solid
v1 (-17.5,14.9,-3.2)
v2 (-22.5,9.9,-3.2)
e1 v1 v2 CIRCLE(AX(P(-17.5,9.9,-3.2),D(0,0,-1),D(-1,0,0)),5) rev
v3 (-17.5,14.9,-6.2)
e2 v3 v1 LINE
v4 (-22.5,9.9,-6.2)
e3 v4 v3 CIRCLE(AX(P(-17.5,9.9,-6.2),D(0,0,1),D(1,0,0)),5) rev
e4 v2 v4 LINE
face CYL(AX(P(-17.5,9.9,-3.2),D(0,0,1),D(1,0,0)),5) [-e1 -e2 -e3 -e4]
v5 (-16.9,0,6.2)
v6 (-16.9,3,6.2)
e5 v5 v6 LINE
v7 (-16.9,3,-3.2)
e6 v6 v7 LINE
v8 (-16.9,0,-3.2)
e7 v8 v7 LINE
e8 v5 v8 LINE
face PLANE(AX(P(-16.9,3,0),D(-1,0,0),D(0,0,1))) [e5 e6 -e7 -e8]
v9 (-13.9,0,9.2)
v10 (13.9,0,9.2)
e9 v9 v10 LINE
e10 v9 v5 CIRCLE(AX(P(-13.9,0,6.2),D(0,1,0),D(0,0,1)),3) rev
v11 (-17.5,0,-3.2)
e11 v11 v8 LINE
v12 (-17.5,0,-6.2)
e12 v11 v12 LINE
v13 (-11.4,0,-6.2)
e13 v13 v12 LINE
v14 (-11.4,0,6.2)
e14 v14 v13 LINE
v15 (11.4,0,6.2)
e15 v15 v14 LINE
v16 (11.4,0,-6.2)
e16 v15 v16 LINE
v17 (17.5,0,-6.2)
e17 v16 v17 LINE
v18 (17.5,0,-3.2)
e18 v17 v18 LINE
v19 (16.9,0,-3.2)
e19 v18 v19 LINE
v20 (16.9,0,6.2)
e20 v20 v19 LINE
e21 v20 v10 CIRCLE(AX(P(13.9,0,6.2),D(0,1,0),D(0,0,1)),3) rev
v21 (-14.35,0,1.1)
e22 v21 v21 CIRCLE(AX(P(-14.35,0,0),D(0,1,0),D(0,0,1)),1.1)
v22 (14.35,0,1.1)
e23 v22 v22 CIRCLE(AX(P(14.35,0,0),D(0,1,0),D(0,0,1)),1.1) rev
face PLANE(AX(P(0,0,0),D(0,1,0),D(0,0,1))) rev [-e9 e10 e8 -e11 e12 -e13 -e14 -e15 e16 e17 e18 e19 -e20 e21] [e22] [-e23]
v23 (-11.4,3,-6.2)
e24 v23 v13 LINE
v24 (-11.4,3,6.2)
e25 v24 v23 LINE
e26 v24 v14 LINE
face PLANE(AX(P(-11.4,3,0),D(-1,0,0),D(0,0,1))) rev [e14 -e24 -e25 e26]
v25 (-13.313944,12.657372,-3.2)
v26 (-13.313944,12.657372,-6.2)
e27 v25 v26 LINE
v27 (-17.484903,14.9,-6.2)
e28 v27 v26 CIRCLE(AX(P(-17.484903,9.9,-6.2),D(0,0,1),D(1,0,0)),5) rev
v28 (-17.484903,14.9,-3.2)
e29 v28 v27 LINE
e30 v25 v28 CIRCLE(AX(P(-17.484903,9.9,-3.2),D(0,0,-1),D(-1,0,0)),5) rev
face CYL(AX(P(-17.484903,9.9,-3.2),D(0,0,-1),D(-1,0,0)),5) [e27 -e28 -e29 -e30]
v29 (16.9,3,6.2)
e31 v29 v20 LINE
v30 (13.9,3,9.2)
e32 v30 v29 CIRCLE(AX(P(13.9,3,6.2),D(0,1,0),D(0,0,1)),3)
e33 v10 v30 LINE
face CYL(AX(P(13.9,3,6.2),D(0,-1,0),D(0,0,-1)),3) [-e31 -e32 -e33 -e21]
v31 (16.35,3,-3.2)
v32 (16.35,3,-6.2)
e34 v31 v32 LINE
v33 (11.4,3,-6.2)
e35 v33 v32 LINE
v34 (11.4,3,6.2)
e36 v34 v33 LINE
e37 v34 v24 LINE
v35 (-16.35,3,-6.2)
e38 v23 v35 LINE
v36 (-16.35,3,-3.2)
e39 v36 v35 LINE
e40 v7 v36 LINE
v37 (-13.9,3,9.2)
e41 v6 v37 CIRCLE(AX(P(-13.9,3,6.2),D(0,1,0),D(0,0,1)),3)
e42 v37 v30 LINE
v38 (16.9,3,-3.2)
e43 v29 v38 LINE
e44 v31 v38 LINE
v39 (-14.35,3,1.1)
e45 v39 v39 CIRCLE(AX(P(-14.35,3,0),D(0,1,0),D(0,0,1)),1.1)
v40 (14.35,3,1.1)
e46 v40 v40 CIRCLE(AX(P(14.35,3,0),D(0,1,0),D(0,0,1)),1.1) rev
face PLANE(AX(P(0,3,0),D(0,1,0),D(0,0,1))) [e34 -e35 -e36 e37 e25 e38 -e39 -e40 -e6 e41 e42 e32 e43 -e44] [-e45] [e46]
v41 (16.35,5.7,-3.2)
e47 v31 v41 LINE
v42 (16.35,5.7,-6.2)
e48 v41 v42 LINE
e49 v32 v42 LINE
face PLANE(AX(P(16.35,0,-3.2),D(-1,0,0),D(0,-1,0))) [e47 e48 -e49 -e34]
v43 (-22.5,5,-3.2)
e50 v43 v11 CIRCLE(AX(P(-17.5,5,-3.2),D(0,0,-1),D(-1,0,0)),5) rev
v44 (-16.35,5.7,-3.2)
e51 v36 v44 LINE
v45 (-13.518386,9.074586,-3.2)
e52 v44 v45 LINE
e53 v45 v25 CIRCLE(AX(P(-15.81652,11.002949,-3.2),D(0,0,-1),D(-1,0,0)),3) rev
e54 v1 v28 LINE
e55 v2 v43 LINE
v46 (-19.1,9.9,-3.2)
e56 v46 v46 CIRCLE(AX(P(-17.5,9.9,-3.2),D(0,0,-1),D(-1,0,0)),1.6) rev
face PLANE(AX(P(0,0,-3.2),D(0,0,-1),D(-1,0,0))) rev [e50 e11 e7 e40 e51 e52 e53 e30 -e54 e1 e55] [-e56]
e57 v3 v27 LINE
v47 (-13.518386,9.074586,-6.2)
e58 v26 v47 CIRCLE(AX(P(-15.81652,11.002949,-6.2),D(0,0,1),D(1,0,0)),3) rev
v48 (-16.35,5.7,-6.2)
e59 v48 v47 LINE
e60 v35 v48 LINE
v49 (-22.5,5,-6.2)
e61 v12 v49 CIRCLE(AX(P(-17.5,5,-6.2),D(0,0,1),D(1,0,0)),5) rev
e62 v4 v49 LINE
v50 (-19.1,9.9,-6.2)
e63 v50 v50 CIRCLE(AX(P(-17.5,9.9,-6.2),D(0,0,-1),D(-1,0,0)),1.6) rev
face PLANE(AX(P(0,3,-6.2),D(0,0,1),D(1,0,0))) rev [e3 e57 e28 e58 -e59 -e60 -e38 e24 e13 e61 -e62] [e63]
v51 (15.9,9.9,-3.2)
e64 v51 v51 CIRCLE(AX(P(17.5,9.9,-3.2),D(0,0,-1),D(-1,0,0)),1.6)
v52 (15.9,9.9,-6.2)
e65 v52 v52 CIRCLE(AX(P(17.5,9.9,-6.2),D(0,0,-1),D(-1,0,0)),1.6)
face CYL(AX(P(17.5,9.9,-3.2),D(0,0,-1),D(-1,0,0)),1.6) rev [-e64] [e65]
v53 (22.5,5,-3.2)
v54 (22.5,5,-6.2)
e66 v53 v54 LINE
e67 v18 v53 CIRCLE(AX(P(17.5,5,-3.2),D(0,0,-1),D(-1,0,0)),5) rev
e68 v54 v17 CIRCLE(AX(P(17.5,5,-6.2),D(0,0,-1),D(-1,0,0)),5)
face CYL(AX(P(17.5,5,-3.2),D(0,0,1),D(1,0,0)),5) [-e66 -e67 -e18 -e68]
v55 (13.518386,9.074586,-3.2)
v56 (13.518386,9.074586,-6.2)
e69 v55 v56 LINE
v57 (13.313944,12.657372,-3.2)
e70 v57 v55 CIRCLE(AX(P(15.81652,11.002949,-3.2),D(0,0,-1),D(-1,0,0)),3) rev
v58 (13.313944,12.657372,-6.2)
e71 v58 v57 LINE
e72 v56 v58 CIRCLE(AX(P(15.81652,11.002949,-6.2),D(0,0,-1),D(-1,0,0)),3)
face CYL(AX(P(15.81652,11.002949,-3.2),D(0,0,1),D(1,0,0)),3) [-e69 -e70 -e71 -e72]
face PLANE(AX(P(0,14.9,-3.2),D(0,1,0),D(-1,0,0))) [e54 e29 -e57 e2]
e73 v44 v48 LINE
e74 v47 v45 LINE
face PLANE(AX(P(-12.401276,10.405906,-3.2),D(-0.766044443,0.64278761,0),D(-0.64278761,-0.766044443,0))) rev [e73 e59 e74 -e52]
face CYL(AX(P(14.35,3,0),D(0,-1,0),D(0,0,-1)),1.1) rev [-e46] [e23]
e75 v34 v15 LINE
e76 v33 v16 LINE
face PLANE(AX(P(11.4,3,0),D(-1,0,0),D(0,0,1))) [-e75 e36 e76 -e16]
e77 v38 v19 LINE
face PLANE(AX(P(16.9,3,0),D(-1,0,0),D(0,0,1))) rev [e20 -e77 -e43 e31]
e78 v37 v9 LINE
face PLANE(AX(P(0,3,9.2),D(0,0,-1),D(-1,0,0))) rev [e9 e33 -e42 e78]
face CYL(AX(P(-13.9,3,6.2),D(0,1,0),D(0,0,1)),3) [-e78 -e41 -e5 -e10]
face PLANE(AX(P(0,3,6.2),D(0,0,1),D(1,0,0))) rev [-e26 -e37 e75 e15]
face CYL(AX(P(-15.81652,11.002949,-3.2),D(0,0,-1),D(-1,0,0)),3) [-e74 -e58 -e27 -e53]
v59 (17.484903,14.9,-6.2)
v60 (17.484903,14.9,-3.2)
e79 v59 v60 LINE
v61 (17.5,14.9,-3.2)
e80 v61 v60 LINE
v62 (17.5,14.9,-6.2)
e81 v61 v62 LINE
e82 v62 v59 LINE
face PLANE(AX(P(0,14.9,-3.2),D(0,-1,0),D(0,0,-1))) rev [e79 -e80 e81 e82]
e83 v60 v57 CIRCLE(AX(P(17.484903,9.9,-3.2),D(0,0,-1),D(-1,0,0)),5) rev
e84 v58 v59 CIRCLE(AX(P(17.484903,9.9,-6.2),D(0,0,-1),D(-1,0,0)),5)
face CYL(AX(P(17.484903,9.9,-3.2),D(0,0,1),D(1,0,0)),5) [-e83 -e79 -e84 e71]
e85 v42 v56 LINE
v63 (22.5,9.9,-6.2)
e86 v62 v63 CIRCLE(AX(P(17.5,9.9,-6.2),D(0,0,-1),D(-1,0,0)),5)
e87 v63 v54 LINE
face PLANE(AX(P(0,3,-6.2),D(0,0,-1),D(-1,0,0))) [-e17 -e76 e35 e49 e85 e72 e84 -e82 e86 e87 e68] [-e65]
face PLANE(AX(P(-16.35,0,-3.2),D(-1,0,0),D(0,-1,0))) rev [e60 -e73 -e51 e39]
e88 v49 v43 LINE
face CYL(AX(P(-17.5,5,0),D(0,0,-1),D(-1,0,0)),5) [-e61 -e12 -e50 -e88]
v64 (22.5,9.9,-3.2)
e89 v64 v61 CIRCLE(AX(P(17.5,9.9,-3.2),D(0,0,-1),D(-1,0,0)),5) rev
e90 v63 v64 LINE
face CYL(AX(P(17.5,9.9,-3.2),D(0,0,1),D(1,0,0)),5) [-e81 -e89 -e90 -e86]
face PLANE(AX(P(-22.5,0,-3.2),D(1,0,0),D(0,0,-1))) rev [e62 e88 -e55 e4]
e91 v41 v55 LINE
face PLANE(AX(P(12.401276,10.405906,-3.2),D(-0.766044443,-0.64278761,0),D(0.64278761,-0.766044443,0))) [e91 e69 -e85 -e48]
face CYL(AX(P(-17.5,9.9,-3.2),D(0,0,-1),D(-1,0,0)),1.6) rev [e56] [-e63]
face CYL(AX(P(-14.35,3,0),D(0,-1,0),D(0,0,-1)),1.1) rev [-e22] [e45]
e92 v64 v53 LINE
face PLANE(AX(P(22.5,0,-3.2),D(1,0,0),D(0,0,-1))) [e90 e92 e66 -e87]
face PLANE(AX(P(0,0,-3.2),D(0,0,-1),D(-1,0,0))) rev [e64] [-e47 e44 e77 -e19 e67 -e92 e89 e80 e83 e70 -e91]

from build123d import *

# Parameters (mm, degrees)
SKETCH1_R           = 1.1
BOSS_EXTRUDE1_DEPTH = 3
FILLET1_R           = 3
SKETCH2_R           = 1.6
BOSS_EXTRUDE2_DEPTH = 3
FILLET2_R           = 5
FILLET3_R           = 3


with BuildPart() as part:
    # Sketch1 → Boss-Extrude1 (new body)
    with BuildSketch(Plane(origin=(0, 0, 0), x_dir=(1, 0, 0), z_dir=(0, 1, 0))):
        Polygon((-16.9, -9.2), (16.9, -9.2), (16.9, 6.2), (11.4, 6.2), (11.4, -6.2), (-11.4, -6.2), (-11.4, 6.2), (-16.9, 6.2), align=None)
        with Locations(Location((-14.35, 0, 0), (0, 0, 270))):
            Circle(SKETCH1_R, mode=Mode.SUBTRACT)
        with Locations(Location((14.35, 0, 0), (0, 0, 270))):
            Circle(SKETCH1_R, mode=Mode.SUBTRACT)
    extrude(amount=BOSS_EXTRUDE1_DEPTH)

    # Fillet1
    fillet1_edges = [part.edges().sort_by_distance(p)[0] for p in [
        (16.9, 1.5, 9.2),
        (-16.9, 1.5, 9.2),
    ]]
    fillet(fillet1_edges, radius=FILLET1_R)

    # Sketch2 → Boss-Extrude2 (add)
    # profile 1 of 2: a face of its own
    with BuildSketch(Plane(origin=(0, 0, -6.2), x_dir=(-1, 0, 0), z_dir=(0, 0, -1))):
        Polygon((-16.35, 3), (-16.35, 5.7), (-12.5, 10.288251331), (-12.5, 14.9), (-22.5, 14.9), (-22.5, 4.9), (-22.5, 0), (-16.9, 0), (-16.9, 3), align=None)
        with Locations((-17.5, 9.9)):
            Circle(SKETCH2_R, mode=Mode.SUBTRACT)
    # profile 2 of 2: a face of its own
    with BuildSketch(Plane(origin=(0, 0, -6.2), x_dir=(-1, 0, 0), z_dir=(0, 0, -1))):
        Polygon((22.5, 14.9), (22.5, 4.9), (22.5, 0), (16.9, 0), (16.9, 3), (16.35, 3), (16.35, 5.7), (12.5, 10.288251331), (12.5, 14.9), align=None)
        with Locations((17.5, 9.9)):
            Circle(SKETCH2_R, mode=Mode.SUBTRACT)
    extrude(amount=-BOSS_EXTRUDE2_DEPTH)

    # Fillet2
    # the kernel refuses this fillet: 5 mm, written as the material it takes off along each edge
    with BuildSketch(Plane(origin=(22.5, 0, -18.7), x_dir=(0, 1, 0), z_dir=(0, 0, 1)), Plane(origin=(-22.5, 14.9, -18.7), x_dir=(0, -1, 0), z_dir=(0, 0, 1))) as fillet2_piece_1:
        with BuildLine():
            CenterArc((FILLET2_R, FILLET2_R), FILLET2_R, 180, 90)
            Line((0, FILLET2_R), (-FILLET2_R * 0.02, FILLET2_R))
            Line((-FILLET2_R * 0.02, FILLET2_R), (-FILLET2_R * 0.02, -FILLET2_R * 0.02))
            Line((-FILLET2_R * 0.02, -FILLET2_R * 0.02), (FILLET2_R, -FILLET2_R * 0.02))
            Line((FILLET2_R, -FILLET2_R * 0.02), (FILLET2_R, 0))
        make_face()
    extrude(amount=28, mode=Mode.SUBTRACT)
    with BuildSketch(Plane(origin=(-22.5, 0, -18.7), x_dir=(0, 1, 0), z_dir=(0, 0, 1)), Plane(origin=(22.5, 14.9, -18.7), x_dir=(0, -1, 0), z_dir=(0, 0, 1))) as fillet2_piece_2:
        with BuildLine():
            CenterArc((FILLET2_R, -FILLET2_R), FILLET2_R, 90, 90)
            Line((0, -FILLET2_R), (-FILLET2_R * 0.02, -FILLET2_R))
            Line((-FILLET2_R * 0.02, -FILLET2_R), (-FILLET2_R * 0.02, FILLET2_R * 0.02))
            Line((-FILLET2_R * 0.02, FILLET2_R * 0.02), (FILLET2_R, FILLET2_R * 0.02))
            Line((FILLET2_R, FILLET2_R * 0.02), (FILLET2_R, 0))
        make_face()
    extrude(amount=28, mode=Mode.SUBTRACT)
    with BuildSketch(Plane(origin=(-12.5, 14.9, -18.662258248), x_dir=(-1, 0, 0), z_dir=(0, 0, 1))) as fillet2_piece_3:
        with BuildLine():
            CenterArc((4.984903299, 5), FILLET2_R, 184.453515666, 85.546484334)
            Line((0, 4.611748669), (-0.099698066, 4.603983642))
            ThreePointArc((-0.099698066, 4.603983642), (-0.1, 2.305874334), (-0.1, 0))
            Line((-0.1, 0), (0, -0.1))
            Line((0, -0.1), (4.984903299, -0.1))
            Line((4.984903299, -0.1), (4.984903299, 0))
        make_face()
    extrude(amount=27.924516497, mode=Mode.SUBTRACT)
    with BuildSketch(Plane(origin=(12.5, 14.9, -18.662258248), x_dir=(1, 0, 0), z_dir=(0, 0, 1))) as fillet2_piece_4:
        with BuildLine():
            CenterArc((4.984903299, -5), FILLET2_R, 90, 85.546484334)
            Line((0, -4.611748669), (-0.099698066, -4.603983642))
            ThreePointArc((-0.099698066, -4.603983642), (-0.1, -2.305874334), (-0.1, 0))
            Line((-0.1, 0), (0, 0.1))
            Line((0, 0.1), (4.984903299, 0.1))
            Line((4.984903299, 0.1), (4.984903299, 0))
        make_face()
    extrude(amount=27.924516497, mode=Mode.SUBTRACT)

    # Fillet3
    fillet3_edges = [part.edges().sort_by_distance(p)[0] for p in [
        (-12.5, 10.288251331, -4.7),
        (12.5, 10.288251331, -4.7),
    ]]
    fillet(fillet3_edges, radius=FILLET3_R)


solid = part.part
